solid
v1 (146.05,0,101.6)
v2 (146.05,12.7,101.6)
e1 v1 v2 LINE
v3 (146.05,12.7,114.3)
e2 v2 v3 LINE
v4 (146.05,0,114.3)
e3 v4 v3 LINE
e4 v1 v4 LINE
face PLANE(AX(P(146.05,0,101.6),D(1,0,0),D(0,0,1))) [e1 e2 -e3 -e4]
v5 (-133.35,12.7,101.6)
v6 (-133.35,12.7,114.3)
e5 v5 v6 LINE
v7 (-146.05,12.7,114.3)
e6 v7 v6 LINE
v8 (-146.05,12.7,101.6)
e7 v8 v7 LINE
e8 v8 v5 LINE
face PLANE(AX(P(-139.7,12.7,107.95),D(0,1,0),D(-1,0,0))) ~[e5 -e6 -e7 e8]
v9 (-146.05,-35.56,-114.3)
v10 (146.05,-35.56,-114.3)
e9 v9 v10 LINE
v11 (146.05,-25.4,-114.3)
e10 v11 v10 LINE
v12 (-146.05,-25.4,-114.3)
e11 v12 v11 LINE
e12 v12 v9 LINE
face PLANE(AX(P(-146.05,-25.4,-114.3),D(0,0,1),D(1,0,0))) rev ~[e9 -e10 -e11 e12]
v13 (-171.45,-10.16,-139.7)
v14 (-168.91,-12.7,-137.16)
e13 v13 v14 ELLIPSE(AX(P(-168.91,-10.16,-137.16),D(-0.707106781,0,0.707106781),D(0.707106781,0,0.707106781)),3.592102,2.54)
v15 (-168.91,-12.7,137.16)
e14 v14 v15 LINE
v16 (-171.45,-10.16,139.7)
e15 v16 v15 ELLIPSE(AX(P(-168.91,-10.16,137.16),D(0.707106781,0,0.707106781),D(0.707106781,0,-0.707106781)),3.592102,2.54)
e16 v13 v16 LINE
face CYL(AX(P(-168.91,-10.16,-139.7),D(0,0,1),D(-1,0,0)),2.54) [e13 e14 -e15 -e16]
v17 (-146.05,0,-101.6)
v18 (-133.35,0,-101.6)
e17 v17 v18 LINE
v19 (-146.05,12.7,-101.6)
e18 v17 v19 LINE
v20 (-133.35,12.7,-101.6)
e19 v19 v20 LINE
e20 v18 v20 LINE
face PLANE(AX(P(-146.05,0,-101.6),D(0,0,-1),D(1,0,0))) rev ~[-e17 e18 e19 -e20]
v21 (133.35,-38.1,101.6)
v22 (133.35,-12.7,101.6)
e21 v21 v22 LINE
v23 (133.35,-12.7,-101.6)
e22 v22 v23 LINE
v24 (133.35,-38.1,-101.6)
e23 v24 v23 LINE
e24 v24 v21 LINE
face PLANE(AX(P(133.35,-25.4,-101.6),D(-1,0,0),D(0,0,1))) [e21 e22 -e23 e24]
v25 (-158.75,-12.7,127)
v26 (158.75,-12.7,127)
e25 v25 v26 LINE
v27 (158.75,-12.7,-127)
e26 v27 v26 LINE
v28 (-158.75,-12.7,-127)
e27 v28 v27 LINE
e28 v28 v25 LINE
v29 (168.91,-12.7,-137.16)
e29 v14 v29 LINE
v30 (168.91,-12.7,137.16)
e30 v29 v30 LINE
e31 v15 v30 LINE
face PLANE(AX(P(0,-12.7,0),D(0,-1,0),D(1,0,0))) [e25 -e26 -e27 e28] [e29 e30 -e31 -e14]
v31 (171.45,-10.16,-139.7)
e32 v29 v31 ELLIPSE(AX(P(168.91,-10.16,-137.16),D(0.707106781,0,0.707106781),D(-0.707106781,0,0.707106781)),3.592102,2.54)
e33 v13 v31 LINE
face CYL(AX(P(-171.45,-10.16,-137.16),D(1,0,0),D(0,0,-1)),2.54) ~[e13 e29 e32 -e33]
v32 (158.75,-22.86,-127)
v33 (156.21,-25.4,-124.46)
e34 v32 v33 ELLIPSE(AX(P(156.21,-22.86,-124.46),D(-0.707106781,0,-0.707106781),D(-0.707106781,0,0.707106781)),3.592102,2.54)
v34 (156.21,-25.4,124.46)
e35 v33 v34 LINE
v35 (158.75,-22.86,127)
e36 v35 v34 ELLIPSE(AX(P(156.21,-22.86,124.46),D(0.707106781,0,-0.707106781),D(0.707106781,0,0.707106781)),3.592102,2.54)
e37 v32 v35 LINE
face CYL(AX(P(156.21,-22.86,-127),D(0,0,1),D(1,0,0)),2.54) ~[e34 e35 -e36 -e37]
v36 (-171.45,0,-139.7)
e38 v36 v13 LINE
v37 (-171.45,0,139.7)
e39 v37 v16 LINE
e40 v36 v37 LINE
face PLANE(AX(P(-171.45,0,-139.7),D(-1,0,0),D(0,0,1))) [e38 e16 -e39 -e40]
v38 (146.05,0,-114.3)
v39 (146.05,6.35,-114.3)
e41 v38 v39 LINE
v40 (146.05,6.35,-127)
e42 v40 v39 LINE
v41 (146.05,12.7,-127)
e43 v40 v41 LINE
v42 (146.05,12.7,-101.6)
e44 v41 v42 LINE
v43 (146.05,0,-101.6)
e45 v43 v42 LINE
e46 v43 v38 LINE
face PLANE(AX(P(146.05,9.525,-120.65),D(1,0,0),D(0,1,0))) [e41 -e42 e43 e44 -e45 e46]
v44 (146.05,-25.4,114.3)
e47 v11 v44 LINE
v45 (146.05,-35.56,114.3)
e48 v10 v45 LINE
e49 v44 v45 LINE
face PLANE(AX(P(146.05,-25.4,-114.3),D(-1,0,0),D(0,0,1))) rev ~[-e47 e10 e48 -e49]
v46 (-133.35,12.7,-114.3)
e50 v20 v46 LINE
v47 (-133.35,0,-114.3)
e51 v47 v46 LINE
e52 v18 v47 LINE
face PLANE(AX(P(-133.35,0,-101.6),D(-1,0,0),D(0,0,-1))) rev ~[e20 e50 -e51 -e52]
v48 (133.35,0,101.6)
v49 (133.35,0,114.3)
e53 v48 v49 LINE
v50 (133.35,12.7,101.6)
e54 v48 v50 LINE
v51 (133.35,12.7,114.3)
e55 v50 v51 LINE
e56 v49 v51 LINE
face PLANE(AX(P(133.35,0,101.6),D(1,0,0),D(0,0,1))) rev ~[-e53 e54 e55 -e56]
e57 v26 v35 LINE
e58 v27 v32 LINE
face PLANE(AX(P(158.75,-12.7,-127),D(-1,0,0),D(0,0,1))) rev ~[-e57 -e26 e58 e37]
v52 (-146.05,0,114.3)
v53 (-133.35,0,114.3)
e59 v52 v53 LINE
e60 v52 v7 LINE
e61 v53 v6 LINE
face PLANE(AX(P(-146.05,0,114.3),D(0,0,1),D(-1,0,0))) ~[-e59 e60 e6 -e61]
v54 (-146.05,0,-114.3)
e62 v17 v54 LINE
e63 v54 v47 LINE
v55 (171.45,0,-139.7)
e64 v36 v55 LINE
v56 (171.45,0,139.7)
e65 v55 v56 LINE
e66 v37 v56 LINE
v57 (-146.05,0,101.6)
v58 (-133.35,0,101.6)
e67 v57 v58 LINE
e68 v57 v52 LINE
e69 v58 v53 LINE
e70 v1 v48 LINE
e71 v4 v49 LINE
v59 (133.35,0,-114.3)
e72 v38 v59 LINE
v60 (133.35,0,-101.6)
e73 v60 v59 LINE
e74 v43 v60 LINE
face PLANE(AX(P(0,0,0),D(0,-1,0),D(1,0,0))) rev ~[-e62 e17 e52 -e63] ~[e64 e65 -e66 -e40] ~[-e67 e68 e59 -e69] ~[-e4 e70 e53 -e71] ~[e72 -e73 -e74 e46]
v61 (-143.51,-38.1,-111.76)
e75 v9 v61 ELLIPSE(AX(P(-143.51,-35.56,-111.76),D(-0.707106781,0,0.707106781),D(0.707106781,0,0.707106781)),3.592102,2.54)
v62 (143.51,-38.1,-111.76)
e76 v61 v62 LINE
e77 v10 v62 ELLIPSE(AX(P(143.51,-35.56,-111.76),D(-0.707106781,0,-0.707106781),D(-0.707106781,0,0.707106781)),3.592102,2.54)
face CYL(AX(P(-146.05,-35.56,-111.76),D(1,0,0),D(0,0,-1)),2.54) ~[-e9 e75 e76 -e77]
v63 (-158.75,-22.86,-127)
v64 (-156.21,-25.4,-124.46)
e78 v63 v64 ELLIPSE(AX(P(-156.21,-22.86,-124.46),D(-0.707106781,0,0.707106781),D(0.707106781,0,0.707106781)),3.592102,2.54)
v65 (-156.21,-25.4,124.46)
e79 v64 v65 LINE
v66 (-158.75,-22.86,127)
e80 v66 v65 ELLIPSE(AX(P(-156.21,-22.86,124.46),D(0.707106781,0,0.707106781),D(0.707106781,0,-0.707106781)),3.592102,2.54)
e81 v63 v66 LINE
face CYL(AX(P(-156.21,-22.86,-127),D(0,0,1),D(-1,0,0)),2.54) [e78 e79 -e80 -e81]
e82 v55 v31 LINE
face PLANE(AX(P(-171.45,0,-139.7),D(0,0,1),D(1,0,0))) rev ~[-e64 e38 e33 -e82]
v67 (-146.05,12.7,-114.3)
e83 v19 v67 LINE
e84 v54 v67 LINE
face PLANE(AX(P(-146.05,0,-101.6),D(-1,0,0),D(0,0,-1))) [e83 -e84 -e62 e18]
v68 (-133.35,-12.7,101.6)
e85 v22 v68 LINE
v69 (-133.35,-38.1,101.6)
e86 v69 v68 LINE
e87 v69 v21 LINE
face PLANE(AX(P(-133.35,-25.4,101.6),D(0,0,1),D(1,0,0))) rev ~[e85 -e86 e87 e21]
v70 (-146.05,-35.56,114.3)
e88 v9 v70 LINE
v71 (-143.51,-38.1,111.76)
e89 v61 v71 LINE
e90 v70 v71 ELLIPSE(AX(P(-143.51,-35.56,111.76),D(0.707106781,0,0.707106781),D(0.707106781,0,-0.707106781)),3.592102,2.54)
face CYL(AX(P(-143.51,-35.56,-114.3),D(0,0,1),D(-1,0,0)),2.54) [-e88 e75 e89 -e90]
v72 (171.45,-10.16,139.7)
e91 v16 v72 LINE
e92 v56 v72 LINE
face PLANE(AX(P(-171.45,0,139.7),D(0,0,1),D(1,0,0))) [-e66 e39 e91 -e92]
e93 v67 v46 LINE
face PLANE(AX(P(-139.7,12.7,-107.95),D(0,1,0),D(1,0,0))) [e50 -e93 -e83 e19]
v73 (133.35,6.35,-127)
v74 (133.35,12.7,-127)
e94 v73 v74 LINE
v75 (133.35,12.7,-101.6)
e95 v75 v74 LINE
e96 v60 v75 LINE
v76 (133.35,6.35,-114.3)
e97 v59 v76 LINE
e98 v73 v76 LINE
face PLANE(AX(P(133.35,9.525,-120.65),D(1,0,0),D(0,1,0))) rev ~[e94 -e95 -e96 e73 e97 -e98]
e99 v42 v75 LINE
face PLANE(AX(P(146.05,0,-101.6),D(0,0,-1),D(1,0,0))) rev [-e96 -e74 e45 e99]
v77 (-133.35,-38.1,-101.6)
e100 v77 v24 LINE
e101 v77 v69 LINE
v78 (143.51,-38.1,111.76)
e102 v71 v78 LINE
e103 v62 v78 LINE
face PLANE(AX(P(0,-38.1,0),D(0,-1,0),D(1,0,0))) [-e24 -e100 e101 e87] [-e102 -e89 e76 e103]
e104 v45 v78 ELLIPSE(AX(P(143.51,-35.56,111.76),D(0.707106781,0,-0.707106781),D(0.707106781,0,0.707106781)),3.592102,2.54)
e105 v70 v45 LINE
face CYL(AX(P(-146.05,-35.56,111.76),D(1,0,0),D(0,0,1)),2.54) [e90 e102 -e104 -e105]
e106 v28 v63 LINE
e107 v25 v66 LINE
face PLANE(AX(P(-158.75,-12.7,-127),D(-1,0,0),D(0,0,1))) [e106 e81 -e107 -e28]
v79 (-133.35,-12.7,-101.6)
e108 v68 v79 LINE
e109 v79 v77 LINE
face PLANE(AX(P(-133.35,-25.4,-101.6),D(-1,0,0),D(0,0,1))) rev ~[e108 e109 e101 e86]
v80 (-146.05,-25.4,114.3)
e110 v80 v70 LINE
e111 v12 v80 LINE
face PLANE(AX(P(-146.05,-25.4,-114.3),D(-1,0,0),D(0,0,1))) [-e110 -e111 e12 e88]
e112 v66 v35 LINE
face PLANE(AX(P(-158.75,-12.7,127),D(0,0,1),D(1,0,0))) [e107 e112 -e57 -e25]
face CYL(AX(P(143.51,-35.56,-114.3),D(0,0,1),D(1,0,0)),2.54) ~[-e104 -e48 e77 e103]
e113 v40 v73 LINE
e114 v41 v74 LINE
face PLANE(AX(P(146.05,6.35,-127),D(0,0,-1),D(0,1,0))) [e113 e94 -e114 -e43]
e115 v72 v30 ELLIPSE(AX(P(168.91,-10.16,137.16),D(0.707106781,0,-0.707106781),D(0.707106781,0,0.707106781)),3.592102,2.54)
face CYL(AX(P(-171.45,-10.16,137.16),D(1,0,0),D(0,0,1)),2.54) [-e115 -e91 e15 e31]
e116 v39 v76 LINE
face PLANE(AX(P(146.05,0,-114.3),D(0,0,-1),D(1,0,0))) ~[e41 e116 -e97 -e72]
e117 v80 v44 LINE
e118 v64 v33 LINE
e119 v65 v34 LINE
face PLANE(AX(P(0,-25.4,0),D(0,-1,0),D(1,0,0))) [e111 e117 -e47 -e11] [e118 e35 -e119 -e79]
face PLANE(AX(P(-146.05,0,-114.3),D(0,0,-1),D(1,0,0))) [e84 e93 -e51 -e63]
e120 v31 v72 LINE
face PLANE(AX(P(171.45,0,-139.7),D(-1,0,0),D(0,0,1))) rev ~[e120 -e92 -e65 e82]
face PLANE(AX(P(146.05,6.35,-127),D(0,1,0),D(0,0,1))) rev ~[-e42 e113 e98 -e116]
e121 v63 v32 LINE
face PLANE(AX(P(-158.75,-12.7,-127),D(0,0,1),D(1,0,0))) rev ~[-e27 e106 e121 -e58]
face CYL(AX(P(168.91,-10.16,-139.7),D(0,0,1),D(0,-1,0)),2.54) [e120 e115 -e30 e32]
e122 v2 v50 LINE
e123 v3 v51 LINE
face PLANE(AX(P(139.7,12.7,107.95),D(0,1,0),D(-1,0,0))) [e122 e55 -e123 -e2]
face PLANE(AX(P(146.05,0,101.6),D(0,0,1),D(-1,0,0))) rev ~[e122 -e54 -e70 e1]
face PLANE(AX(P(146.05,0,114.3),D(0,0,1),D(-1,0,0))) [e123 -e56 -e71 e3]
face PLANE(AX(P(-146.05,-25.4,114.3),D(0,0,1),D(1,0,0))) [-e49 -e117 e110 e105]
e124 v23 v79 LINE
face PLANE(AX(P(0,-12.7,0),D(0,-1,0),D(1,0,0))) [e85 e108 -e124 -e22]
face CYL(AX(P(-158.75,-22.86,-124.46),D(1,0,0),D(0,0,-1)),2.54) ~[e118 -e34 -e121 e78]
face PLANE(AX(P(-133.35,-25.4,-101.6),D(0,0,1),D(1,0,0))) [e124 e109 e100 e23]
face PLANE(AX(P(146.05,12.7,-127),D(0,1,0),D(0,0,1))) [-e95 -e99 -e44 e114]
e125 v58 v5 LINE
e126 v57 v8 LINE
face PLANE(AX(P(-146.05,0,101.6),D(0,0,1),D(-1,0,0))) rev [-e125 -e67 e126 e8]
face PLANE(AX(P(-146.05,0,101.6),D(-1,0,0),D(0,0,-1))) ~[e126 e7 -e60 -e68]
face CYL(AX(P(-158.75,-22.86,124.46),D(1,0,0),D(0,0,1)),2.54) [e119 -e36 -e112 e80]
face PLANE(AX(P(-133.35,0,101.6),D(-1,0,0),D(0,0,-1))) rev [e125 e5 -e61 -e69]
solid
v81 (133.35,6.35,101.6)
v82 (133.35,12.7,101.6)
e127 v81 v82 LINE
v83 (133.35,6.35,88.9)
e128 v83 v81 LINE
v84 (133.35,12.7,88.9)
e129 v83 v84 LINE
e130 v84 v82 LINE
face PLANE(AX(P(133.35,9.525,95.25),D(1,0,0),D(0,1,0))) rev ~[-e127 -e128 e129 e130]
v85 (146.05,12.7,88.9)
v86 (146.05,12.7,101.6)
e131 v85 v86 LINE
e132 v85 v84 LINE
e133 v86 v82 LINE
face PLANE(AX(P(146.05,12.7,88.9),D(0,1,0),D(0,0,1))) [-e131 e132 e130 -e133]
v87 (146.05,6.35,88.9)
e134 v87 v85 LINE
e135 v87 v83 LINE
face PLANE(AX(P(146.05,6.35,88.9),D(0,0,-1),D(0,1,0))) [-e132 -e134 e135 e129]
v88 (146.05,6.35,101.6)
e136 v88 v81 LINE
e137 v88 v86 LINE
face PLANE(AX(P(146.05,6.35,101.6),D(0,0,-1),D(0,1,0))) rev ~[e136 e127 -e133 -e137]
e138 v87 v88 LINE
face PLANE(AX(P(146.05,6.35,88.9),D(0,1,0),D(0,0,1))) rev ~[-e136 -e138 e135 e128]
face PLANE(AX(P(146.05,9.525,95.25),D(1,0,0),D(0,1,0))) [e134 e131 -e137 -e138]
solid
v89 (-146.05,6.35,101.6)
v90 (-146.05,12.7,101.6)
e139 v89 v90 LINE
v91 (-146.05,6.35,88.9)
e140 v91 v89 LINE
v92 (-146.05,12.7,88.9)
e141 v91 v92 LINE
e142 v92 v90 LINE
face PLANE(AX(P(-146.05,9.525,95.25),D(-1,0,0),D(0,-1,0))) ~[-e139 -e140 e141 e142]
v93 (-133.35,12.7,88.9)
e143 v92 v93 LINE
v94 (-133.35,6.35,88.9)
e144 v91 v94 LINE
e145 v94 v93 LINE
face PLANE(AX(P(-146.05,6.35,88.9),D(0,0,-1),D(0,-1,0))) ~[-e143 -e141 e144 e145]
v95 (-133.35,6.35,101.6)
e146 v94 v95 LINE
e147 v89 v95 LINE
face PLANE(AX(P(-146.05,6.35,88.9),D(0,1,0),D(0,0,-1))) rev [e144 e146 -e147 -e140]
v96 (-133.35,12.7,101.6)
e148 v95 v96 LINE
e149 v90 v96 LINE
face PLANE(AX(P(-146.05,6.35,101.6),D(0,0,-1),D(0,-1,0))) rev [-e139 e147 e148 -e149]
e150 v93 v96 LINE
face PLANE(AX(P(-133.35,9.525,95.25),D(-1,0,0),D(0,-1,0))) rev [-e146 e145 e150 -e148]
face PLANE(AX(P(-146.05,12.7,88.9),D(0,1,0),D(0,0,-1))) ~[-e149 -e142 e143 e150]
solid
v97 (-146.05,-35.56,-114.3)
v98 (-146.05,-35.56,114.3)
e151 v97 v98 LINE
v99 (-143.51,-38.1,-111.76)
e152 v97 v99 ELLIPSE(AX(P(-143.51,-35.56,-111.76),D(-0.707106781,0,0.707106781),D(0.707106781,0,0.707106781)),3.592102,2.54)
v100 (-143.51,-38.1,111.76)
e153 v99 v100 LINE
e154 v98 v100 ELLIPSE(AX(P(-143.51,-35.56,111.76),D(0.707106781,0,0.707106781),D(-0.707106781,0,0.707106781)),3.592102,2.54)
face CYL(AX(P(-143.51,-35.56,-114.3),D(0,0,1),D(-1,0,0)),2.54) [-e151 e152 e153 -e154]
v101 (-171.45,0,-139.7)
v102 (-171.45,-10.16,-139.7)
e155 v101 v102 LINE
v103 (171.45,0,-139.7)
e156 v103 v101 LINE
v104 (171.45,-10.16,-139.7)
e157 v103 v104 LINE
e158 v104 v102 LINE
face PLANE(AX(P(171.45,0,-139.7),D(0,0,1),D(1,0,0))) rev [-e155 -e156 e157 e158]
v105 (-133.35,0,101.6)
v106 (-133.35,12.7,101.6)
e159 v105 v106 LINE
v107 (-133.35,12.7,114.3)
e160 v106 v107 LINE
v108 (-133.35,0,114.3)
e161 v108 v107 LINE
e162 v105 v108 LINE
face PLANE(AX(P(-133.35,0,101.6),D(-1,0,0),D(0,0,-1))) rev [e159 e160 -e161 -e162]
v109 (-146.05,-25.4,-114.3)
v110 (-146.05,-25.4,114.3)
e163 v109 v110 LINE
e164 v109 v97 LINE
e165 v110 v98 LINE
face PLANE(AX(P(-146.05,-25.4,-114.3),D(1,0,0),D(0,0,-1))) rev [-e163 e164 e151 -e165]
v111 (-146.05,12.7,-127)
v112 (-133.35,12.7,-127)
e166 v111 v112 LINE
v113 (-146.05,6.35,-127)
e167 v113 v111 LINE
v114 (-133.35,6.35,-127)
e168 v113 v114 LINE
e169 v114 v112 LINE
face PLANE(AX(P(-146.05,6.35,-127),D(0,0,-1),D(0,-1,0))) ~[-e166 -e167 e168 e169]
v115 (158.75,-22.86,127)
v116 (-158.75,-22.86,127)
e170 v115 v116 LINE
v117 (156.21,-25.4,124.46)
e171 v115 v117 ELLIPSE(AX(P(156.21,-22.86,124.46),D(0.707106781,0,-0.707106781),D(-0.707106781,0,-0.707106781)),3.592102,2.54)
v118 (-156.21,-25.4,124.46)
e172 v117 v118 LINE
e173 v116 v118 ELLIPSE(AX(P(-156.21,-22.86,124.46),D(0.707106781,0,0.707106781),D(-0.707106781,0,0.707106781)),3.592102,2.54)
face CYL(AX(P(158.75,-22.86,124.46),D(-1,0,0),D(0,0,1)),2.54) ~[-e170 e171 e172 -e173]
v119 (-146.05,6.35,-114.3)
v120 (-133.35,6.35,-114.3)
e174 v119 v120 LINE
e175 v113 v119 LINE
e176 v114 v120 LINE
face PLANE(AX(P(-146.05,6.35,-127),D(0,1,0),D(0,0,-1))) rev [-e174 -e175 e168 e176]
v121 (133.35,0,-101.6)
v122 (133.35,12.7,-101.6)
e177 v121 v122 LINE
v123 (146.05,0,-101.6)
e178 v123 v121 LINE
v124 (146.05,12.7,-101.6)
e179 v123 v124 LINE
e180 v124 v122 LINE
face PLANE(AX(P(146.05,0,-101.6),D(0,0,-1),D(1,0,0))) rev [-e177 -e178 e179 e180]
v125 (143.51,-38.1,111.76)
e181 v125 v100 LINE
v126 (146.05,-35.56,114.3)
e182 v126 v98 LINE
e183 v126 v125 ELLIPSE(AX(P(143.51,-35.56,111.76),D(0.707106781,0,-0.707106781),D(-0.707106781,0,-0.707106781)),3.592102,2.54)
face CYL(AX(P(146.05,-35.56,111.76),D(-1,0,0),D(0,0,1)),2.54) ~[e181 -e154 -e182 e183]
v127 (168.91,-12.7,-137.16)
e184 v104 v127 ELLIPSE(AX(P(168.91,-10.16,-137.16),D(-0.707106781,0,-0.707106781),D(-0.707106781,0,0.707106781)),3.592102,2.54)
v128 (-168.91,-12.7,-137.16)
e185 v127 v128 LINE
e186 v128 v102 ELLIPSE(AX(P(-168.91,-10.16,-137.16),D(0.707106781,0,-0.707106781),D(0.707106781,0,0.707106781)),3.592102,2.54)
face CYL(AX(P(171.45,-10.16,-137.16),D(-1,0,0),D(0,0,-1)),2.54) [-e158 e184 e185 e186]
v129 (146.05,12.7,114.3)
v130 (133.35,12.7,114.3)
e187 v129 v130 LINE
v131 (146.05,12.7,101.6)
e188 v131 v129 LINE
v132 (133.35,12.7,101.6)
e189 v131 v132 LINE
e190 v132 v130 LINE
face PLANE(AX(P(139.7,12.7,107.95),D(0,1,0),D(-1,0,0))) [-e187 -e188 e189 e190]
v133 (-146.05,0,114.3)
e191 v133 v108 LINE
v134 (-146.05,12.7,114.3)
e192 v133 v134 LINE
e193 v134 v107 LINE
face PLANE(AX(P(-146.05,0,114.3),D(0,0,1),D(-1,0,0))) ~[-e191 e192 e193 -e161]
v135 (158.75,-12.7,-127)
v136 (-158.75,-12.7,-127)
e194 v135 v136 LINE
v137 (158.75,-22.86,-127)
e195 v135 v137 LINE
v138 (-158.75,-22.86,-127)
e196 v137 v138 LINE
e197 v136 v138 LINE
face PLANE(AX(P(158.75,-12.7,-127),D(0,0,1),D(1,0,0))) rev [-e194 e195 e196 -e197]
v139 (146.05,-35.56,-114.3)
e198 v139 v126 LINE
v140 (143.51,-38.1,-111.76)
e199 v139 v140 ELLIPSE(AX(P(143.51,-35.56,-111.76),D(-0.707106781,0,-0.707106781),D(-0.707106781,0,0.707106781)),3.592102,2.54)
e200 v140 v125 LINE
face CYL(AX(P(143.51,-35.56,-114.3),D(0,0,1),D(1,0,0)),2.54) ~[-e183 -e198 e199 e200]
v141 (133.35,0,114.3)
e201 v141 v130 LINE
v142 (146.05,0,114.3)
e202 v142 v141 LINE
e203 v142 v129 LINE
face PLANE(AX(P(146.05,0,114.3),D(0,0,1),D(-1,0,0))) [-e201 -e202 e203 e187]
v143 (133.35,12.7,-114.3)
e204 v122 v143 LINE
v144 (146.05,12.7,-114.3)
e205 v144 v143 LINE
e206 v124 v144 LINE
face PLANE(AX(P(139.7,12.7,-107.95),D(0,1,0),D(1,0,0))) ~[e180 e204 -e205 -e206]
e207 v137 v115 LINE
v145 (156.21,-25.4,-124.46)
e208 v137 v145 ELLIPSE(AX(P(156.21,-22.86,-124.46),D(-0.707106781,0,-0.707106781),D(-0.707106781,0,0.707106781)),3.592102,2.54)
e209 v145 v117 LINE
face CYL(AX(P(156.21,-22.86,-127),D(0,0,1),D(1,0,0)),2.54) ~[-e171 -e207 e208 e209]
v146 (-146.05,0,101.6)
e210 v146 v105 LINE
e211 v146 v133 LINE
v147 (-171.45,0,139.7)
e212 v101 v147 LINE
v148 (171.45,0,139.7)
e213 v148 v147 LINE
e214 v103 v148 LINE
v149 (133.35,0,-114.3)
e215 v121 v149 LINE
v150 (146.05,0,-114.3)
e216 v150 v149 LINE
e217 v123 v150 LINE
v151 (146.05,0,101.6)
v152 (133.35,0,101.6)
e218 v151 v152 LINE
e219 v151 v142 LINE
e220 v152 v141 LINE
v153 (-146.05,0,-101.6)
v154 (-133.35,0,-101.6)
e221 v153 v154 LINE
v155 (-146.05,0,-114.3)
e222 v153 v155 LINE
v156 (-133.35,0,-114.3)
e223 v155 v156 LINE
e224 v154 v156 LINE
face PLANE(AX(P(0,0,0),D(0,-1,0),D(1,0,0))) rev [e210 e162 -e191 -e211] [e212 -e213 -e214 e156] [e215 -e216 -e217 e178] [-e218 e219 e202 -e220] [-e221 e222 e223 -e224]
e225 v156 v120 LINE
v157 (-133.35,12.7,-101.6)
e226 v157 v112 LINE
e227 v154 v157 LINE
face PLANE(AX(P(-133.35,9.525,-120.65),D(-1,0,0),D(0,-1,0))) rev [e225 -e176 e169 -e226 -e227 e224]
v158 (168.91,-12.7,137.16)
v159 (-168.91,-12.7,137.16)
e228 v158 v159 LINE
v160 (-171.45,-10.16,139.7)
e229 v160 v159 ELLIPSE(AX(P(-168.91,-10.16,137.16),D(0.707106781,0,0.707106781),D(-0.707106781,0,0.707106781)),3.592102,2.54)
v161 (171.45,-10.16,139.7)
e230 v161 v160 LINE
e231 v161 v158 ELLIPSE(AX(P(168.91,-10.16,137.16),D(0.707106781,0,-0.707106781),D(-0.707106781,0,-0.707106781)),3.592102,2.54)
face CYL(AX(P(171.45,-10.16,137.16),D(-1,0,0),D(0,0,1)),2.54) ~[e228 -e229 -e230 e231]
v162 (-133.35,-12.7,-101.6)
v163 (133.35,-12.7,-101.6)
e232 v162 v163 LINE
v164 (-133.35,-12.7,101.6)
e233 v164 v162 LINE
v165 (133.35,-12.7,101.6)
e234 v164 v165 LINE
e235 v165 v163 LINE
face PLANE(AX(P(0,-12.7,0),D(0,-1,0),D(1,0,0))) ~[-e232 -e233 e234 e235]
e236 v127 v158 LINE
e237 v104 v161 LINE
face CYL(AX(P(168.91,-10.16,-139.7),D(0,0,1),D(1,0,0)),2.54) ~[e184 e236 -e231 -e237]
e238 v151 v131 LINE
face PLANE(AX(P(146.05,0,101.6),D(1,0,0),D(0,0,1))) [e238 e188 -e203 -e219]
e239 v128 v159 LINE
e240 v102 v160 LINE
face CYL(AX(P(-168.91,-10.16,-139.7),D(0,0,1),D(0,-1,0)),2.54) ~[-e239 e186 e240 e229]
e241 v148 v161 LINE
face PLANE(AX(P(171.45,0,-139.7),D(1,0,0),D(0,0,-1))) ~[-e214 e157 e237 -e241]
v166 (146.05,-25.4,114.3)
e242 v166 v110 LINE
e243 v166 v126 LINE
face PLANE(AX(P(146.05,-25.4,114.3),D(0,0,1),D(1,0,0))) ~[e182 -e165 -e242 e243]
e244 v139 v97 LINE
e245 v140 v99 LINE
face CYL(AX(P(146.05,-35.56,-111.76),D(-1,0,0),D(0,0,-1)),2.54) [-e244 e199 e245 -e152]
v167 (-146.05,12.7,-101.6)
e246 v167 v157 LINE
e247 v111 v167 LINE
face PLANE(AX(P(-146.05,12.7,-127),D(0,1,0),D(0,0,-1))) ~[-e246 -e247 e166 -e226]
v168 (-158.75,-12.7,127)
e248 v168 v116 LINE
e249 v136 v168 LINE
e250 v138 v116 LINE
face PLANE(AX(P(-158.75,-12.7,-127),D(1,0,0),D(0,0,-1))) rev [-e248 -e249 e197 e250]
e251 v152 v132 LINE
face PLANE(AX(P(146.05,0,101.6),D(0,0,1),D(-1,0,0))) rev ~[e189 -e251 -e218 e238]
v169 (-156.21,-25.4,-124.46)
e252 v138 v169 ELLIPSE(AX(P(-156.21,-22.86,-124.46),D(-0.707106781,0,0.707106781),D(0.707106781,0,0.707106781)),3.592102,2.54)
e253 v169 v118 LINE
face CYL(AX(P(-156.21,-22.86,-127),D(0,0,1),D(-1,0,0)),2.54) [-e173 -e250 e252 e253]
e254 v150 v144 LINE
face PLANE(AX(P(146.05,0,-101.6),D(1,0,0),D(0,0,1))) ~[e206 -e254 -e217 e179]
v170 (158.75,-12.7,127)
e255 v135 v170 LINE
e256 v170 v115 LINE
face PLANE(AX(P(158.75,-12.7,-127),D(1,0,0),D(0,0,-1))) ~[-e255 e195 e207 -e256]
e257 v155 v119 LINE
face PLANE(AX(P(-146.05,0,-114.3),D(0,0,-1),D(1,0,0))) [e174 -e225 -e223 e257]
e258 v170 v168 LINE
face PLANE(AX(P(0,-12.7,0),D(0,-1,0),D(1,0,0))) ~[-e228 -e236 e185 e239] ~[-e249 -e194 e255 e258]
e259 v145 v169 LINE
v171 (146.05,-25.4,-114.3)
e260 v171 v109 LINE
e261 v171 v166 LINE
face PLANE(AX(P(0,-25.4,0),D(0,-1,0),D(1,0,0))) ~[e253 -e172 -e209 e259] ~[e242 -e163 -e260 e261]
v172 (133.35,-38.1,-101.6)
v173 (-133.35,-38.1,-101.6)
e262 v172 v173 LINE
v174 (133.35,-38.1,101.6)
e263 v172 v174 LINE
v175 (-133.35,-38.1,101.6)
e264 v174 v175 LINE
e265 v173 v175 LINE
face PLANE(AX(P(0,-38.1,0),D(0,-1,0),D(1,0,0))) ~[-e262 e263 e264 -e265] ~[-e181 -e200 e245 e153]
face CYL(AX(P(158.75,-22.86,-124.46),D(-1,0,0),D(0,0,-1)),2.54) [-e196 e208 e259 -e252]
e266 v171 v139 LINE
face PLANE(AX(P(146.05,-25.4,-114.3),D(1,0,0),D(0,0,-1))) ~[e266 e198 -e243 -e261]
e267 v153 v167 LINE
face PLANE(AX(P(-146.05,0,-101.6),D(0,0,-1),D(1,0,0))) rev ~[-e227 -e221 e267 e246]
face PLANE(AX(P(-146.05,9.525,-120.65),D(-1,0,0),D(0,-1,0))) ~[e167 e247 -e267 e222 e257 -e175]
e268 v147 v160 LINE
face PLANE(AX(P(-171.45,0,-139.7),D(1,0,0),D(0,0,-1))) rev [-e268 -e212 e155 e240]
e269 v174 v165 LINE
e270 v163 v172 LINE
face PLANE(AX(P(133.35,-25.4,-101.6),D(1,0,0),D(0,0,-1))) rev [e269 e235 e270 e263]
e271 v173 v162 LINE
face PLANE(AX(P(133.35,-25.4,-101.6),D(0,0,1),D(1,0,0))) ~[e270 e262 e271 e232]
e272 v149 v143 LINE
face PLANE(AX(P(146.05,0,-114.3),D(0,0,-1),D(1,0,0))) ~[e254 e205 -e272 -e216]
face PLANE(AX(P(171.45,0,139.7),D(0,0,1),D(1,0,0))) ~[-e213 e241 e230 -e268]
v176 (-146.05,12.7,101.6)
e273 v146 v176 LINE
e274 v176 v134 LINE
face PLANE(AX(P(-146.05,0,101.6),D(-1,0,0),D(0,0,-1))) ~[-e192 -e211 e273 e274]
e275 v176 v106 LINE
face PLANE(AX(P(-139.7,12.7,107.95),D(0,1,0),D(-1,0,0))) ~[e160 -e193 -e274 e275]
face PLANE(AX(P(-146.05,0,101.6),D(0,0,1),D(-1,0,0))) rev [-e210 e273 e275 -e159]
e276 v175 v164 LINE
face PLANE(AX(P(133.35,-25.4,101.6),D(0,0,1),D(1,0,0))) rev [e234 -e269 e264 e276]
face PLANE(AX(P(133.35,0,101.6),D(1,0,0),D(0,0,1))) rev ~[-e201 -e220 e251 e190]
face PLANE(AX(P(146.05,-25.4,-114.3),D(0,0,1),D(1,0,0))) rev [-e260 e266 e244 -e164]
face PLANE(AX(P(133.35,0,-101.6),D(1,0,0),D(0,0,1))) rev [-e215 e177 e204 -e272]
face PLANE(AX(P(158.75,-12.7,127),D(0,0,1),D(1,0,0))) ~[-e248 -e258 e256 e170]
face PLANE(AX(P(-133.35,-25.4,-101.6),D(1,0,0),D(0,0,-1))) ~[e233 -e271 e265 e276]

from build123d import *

# Parameters (mm, degrees)
F0_W      = 342.9
F0_H      = 279.4
F1_DEPTH  = 12.7
F2_W      = 317.5
F2_H      = 254
F3_DEPTH  = 12.7
F4_W      = 292.1
F4_H      = 228.6
F5_DEPTH  = 12.7
F6_T      = -12.7
F7_W      = 279.4
F7_H      = 3.175
F8_DEPTH  = 25.4
F9_R      = 2.54
F10_W     = 12.7
F10_H     = 12.7
F11_DEPTH = 12.7
F14_W     = 6.35
F14_H     = 12.7
F15_DEPTH = 12.7
F17_W     = 6.35
F17_H     = 12.7
F18_DEPTH = 12.7


# Not quite as in the source:
# - a feature of the source that left no trace in its solid (it failed there, or was rolled back) is left out
# - a shell that OpenCascade refuses in one call is made with other operations: the cavity is built on its own and cut out


with BuildPart() as f1:
    # F0 (on Front) → F1 (new body)
    with BuildSketch(Plane.XZ):
        Rectangle(F0_W, F0_H)
    extrude(amount=F1_DEPTH)

    # F2 (on face) → F3 (join)
    with BuildSketch(Plane.XZ.offset(12.7)):
        Rectangle(F2_W, F2_H)
    extrude(amount=F3_DEPTH)

    # F4 (on face) → F5 (join)
    with BuildSketch(Plane.XZ.offset(25.4)):
        Rectangle(F4_W, F4_H)
    extrude(amount=F5_DEPTH)

    # F6: a shell. OpenCascade refuses it in one call, so the cavity is built on its own and cut out:
    # the body offset inwards by the wall thickness, plus a prism from it out through each open face.
    f6_core = offset(f1.part, amount=F6_T, kind=Kind.INTERSECTION, mode=Mode.PRIVATE)
    f6_exits = [f6_core.faces().sort_by_distance(p)[0] for p in [
        (0, -25.4, 0),
    ]]
    add(f6_core, mode=Mode.SUBTRACT)
    extrude(f6_exits, amount=-F6_T, mode=Mode.SUBTRACT)

    # F7 (on face) → F8 (cut)
    with BuildSketch(Plane.XY.offset(127)):
        with Locations((0.0025813838, -20.3239014355)):
            Rectangle(F7_W, F7_H)
    extrude(amount=-F8_DEPTH, mode=Mode.SUBTRACT)

    # F9
    f9_edges = [f1.edges().sort_by_distance(p)[0] for p in [
        (0, -38.1, 114.3),
        (146.05, -38.1, 0),
        (158.75, -25.4, 0),
        (0, -25.4, 127),
        (0, -12.7, 139.7),
        (171.45, -12.7, 0),
        (0, -38.1, -114.3),
        (0, -25.4, -127),
        (0, -12.7, -139.7),
        (-171.45, -12.7, 0),
        (-158.75, -25.4, 0),
        (-146.05, -38.1, 0),
    ]]
    fillet(f9_edges, radius=F9_R)

    # F10 (on face) → F11 (join)
    with BuildSketch(Plane(origin=(0, 0, 0), x_dir=(-1, 0, 0), z_dir=(0, 1, 0))):
        with Locations((-139.7, 107.95)):
            Rectangle(F10_W, F10_H)
    extrude(amount=F11_DEPTH)

    # F12: F1 across plane


with BuildPart() as f1_1:
    add(f1.part)
    add(f1.part.mirror(Plane.YZ))

    # F13: F1 across plane


with BuildPart() as f1_2:
    add(f1_1.part)
    add(f1_1.part.mirror(Plane.XY))

    # F17 (on face) → F18 (join)
    with BuildSketch(Plane.YZ.offset(146.05)):
        with Locations((9.525, -120.65)):
            Rectangle(F17_W, F17_H)
    extrude(amount=-F18_DEPTH)


with BuildPart() as f15:
    # F14 (on face) → F15 (new body)
    with BuildSketch(Plane.YZ.offset(146.05)):
        with Locations((9.525, 95.25)):
            Rectangle(F14_W, F14_H)
    extrude(amount=-F15_DEPTH)


with BuildPart() as f16_1:
    # F16: instance of F15
    add(f15.part.mirror(Plane.YZ))


with BuildPart() as f19_1:
    # F19: instance of F1
    add(f1_2.part.mirror(Plane.YZ))


solid = Compound([f1_2.part, f15.part, f16_1.part, f19_1.part])
